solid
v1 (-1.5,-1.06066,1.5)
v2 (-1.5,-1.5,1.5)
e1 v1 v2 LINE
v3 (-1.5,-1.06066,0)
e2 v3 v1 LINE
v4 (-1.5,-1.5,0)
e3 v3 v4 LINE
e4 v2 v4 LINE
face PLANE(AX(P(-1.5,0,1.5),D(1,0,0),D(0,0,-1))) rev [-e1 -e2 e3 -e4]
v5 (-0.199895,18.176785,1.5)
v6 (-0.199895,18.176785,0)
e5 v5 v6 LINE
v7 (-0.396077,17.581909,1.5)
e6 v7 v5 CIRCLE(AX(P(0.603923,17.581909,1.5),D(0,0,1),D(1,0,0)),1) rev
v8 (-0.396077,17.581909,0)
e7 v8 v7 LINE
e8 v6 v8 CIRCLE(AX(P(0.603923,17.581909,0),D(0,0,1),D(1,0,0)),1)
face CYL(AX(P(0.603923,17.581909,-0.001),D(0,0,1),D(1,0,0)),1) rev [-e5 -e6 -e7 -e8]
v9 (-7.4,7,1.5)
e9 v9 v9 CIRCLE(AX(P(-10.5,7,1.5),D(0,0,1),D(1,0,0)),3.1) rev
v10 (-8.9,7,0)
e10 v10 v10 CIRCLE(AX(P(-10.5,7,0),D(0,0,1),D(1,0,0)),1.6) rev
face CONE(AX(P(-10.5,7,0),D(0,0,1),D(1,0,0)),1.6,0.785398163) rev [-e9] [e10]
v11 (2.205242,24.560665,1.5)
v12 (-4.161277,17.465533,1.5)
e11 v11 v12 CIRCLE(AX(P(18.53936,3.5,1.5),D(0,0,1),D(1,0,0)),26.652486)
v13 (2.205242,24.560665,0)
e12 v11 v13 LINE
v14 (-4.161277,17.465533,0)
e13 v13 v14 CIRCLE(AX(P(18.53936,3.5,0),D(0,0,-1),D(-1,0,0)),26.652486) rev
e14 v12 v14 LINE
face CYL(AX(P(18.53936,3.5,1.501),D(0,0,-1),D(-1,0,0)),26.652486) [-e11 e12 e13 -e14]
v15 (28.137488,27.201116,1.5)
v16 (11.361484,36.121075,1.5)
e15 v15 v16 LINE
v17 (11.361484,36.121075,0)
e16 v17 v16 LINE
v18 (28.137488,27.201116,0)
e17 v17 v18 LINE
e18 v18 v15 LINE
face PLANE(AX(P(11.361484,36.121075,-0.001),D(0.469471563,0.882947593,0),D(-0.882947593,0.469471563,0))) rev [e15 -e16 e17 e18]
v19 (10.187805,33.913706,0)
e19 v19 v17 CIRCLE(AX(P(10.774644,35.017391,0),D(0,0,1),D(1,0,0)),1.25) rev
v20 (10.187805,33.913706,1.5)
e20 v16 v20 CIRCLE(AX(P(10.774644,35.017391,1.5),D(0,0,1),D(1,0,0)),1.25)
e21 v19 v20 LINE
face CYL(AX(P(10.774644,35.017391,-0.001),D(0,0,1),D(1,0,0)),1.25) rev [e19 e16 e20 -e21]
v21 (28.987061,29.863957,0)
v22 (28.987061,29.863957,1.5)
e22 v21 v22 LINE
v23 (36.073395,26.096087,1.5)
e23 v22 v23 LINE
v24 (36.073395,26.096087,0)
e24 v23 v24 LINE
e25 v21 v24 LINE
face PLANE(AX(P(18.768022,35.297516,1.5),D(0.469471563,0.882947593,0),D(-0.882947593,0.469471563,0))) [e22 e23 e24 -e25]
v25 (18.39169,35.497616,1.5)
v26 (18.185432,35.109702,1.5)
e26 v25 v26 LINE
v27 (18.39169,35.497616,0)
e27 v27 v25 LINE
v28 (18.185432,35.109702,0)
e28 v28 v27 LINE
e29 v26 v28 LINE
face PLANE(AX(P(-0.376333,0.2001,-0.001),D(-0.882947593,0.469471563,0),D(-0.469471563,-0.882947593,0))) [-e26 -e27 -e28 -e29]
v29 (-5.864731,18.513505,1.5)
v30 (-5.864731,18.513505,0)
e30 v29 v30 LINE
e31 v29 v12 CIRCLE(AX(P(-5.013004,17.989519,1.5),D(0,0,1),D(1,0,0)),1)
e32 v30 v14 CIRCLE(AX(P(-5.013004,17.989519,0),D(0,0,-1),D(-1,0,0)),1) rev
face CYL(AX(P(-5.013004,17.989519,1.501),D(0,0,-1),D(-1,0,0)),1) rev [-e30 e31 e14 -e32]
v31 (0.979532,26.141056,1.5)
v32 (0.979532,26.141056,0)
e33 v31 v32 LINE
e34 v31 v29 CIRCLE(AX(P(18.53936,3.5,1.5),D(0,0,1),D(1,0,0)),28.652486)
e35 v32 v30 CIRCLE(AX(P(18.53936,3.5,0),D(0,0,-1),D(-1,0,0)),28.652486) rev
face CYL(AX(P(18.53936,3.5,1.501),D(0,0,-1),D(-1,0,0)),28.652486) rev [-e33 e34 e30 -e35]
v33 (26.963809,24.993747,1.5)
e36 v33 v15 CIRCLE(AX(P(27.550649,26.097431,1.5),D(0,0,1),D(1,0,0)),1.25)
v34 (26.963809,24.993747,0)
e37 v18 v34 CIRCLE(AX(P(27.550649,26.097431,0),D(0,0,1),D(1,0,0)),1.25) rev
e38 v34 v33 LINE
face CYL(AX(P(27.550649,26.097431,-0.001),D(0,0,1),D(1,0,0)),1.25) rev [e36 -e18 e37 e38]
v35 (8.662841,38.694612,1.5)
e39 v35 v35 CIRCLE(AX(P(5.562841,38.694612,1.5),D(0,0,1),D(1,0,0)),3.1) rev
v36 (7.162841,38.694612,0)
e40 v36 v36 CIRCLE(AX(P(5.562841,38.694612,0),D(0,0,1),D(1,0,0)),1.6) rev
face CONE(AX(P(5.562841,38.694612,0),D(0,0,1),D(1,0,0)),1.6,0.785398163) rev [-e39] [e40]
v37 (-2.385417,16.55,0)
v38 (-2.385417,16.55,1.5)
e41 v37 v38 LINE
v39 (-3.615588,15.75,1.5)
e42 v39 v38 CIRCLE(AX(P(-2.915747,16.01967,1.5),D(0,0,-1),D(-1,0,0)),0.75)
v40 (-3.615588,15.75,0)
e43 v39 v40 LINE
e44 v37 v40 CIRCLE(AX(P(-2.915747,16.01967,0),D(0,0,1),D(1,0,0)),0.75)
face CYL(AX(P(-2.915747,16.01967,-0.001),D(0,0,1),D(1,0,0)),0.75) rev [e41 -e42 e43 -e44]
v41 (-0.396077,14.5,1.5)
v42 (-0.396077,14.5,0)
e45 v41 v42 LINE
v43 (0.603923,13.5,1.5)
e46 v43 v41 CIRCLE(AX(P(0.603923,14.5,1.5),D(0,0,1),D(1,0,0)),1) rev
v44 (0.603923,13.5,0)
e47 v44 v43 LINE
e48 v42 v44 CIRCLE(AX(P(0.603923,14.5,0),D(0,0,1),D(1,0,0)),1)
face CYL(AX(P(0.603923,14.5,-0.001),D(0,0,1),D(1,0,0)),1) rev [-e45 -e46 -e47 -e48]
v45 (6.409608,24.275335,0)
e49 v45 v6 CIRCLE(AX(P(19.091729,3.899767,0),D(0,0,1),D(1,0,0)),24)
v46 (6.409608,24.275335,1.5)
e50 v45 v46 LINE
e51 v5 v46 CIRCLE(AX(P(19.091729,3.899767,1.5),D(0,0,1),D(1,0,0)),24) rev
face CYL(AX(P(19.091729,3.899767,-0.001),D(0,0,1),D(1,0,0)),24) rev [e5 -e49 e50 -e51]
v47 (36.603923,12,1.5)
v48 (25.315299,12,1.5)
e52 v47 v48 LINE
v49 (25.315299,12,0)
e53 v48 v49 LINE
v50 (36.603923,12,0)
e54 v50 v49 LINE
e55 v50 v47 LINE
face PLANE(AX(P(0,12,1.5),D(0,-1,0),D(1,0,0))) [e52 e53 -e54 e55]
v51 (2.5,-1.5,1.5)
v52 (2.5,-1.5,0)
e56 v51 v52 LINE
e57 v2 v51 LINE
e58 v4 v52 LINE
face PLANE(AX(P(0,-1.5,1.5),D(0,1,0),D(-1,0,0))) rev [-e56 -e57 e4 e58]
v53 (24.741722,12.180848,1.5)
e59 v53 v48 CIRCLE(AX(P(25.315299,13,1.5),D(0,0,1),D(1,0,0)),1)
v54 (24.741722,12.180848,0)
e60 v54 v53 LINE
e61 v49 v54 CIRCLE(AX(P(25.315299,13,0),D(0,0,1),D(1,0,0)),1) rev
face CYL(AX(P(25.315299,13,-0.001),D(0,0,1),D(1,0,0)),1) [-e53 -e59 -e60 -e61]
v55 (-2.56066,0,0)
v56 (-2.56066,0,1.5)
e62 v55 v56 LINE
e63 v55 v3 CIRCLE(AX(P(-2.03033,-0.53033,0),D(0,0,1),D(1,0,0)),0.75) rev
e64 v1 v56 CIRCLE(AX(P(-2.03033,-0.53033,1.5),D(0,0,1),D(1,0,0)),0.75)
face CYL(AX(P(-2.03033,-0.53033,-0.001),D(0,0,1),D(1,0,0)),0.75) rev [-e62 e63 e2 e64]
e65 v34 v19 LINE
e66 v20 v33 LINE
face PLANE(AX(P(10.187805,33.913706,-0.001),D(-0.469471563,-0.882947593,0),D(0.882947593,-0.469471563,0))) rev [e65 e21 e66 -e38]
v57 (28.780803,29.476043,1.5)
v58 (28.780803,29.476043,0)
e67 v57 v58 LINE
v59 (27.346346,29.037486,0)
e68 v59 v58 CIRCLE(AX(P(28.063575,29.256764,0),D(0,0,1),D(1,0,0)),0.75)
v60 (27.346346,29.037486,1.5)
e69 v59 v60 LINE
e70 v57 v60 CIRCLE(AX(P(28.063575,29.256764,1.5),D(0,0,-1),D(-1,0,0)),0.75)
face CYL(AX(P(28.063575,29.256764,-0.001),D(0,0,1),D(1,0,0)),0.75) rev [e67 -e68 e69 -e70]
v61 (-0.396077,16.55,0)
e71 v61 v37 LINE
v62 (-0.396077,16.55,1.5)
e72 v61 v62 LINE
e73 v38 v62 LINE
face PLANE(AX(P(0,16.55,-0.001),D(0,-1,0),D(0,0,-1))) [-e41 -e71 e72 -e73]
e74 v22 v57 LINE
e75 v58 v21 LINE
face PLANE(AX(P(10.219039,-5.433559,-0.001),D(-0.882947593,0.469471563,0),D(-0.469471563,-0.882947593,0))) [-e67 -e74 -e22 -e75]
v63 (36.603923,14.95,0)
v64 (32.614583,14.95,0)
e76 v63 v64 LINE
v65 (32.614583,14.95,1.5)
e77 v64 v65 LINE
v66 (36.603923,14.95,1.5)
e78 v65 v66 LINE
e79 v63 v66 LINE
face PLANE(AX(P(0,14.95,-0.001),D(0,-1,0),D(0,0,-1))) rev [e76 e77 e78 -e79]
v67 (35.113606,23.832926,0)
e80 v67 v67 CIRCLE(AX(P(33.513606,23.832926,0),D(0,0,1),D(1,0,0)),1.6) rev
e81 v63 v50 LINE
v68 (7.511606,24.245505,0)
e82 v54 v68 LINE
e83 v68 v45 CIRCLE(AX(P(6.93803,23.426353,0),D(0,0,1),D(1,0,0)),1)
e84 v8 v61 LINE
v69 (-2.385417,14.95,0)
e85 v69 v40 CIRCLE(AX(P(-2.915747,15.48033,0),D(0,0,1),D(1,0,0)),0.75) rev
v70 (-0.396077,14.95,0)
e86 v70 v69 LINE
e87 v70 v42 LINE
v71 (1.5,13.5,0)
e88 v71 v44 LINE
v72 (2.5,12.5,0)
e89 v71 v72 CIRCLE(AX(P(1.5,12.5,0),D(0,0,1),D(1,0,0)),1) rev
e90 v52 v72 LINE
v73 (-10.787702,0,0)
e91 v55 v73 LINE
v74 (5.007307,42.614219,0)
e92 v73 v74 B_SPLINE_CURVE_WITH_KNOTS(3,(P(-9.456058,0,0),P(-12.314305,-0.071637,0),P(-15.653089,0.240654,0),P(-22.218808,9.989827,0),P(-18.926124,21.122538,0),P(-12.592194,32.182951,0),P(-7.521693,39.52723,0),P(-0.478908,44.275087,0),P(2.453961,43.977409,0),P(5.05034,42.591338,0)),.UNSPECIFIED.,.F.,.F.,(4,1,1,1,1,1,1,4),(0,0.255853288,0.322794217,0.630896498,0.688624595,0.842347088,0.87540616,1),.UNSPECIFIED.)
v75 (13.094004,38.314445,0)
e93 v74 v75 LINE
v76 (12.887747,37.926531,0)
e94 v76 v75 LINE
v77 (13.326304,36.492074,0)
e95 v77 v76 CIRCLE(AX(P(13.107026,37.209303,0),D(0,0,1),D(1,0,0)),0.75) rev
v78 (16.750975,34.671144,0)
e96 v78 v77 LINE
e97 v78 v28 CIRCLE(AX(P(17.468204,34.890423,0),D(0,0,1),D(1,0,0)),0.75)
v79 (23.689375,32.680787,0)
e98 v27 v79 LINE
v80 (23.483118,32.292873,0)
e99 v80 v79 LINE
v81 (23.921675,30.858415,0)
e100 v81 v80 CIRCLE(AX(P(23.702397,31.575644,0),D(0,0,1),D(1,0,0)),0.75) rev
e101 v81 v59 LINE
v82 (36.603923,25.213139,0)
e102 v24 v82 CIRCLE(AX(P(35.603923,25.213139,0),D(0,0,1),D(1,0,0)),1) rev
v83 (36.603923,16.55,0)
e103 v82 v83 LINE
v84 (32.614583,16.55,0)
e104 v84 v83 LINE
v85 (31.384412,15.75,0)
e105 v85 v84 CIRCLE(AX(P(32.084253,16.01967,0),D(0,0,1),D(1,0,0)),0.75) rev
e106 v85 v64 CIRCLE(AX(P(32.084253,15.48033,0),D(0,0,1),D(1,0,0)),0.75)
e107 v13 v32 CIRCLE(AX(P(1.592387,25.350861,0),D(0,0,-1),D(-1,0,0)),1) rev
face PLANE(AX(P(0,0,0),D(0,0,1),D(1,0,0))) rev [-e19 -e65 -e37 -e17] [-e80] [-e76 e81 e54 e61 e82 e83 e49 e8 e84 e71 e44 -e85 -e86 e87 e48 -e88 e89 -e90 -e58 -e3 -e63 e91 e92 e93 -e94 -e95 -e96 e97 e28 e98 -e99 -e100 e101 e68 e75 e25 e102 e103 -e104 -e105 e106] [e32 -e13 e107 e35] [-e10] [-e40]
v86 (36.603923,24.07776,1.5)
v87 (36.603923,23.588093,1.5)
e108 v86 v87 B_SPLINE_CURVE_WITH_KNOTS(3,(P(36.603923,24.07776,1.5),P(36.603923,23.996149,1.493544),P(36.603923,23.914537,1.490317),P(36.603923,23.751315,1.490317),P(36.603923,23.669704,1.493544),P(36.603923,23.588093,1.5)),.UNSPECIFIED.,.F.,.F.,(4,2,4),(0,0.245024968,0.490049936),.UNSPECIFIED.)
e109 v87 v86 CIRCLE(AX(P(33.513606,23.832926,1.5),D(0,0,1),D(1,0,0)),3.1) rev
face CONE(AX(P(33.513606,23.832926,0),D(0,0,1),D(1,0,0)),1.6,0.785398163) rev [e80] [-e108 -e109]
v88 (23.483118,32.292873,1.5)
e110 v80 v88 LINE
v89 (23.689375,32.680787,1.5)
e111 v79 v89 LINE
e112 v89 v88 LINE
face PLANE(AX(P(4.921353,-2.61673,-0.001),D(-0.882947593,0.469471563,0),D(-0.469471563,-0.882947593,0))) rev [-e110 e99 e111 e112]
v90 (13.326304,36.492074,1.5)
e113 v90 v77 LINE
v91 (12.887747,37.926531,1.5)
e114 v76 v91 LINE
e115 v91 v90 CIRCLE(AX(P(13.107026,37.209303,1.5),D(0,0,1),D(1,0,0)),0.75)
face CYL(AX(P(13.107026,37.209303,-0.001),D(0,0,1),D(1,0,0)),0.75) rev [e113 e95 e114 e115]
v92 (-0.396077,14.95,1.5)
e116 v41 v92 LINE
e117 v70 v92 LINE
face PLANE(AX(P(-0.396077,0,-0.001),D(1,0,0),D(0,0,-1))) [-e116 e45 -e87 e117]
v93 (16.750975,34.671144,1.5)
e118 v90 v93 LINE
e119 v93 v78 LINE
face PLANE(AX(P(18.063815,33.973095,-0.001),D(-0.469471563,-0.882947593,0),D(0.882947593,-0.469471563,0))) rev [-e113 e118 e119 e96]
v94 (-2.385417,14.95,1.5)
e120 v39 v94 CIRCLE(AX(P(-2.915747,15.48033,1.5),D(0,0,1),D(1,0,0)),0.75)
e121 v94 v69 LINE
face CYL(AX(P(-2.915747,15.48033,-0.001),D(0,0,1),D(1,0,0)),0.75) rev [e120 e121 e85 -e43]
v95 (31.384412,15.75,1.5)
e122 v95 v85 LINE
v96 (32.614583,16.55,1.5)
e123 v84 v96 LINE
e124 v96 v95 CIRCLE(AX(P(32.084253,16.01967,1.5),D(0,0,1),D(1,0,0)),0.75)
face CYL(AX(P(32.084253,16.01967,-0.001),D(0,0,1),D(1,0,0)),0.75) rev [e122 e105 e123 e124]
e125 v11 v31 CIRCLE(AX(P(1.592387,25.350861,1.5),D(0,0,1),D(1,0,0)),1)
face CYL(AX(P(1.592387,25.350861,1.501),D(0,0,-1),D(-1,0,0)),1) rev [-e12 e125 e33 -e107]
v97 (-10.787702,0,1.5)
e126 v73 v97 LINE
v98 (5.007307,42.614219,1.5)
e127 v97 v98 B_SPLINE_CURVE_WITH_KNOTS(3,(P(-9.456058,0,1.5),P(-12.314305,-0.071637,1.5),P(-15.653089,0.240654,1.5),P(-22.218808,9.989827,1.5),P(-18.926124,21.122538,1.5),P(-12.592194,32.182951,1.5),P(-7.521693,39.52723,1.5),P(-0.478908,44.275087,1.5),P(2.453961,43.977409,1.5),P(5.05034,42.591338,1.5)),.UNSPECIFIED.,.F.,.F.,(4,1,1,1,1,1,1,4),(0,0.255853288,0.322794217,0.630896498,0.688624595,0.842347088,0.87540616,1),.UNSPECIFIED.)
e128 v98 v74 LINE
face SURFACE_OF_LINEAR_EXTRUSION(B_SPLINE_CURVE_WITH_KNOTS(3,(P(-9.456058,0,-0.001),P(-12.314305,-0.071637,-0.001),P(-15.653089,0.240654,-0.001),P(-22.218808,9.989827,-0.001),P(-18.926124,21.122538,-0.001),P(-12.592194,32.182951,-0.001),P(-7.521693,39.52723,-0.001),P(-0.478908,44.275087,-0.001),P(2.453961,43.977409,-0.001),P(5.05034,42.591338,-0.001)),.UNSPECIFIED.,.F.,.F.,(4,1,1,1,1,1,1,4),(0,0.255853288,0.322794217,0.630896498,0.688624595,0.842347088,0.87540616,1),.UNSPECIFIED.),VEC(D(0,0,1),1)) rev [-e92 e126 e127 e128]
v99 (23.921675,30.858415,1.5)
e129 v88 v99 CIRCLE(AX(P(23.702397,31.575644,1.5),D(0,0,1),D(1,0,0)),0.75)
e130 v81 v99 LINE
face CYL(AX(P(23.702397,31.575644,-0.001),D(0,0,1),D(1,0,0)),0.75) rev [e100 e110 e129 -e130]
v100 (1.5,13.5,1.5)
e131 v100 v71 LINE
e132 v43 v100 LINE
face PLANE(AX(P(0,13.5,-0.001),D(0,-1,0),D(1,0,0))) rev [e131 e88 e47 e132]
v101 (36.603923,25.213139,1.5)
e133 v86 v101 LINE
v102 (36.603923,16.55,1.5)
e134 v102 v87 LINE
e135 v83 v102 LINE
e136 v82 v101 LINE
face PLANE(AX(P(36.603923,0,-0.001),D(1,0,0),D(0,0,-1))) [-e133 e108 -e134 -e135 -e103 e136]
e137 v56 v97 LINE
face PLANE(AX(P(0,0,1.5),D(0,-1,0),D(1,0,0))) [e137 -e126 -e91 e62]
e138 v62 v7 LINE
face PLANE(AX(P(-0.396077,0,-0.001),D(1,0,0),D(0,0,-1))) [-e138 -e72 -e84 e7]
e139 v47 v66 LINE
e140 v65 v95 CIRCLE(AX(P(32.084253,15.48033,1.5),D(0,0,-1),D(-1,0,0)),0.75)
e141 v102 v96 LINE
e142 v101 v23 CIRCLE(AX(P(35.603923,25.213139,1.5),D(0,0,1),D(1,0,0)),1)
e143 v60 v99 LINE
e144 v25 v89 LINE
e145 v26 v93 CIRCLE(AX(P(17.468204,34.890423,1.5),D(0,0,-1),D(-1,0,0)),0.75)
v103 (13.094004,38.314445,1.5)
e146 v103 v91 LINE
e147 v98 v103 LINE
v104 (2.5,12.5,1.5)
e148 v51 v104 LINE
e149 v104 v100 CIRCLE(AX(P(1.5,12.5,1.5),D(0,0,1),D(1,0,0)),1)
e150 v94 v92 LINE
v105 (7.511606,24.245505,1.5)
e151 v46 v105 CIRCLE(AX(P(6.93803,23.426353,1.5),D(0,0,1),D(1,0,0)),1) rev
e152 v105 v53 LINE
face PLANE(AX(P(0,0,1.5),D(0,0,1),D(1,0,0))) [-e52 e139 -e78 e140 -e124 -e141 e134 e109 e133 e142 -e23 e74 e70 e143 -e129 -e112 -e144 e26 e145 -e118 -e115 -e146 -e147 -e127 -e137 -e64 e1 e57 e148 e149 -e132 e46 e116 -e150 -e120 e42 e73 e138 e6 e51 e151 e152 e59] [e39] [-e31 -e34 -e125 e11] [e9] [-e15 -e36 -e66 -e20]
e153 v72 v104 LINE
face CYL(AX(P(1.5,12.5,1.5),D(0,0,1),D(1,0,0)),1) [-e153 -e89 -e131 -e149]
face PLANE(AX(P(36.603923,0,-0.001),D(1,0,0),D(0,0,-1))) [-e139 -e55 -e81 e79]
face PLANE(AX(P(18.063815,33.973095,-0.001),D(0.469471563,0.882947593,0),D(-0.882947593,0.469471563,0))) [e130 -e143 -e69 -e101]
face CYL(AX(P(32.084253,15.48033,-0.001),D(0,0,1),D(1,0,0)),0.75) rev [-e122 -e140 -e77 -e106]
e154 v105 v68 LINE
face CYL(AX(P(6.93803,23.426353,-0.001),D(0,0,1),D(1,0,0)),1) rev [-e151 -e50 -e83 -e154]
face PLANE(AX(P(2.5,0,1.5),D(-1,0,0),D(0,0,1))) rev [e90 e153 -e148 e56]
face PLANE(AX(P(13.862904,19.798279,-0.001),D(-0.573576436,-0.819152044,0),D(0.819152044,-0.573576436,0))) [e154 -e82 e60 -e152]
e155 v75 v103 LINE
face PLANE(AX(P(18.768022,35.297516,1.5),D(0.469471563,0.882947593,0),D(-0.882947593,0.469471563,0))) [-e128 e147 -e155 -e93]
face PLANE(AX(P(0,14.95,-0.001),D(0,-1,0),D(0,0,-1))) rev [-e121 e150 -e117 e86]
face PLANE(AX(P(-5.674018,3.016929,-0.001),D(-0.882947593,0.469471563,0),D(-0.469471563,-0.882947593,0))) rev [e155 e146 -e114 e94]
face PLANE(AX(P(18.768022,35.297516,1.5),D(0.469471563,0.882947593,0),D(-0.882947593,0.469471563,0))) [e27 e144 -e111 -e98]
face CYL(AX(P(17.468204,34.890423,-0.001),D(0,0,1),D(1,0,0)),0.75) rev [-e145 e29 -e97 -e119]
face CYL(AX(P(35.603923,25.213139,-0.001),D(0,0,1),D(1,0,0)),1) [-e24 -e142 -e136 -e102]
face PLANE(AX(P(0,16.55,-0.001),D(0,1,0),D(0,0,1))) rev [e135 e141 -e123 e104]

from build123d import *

# Parameters (mm, degrees)
BASE_DEPTH                        = 1.5
CAMERA_CUT_REACH                  = 81.23
TOP_COVER_SOCKETS_REACH           = 81.23
SKETCH4_W                         = 5
SKETCH4_H                         = 1.5
STANDOFF_HOLE_REACH               = 62.831
SKETCH5_R                         = 1.6
GOPRO_MOUNT_HOLDERS_REACH         = 62.831
CAMERA_ANGLE_ADJUSTMENT_CUT_REACH = 62.831
FILLET6_R                         = 1
MILLING_START                     = -1.5
SKETCH10_R                        = 0.75
MILLING_HOLES_DEPTH               = 1.5
GOPRO_STRAP_REACH                 = 62.831
CHAMFER1_SIZE                     = 1.5
FRONT_CURVE_REACH                 = 62.831
FILLET7_R                         = 1


with BuildPart() as part:
    # Sketch1 → Base (new body)
    with BuildSketch(Plane.XY):
        Polygon((2.5, 0), (0, 0), (-1.5, 0), (-1.5, -1.5), (2.5, -1.5), align=None)
        Polygon((-1.5, 0), (0, 0), (2.5, 0), (2.5, 12), (62.584278166, 12), (-6.179064047, 48.562117607), (-32, 0), align=None)
    extrude(amount=BASE_DEPTH)

    # Sketch3 → Camera cut (cut, up to next)
    with BuildSketch(Plane.XY.offset(1.5), mode=Mode.PRIVATE) as camera_cut_sk1:
        with BuildLine():
            Line((2.5, 12), (25, 12))
            Line((25, 12), (6.978655026, 24.6186816))
            ThreePointArc((6.978655026, 24.6186816), (2.93893247, 21.650461355), (-0.396076952, 17.907814978))
            Line((-0.396076952, 17.907814978), (-0.396076952, 13.5))
            Line((-0.396076952, 13.5), (2.5, 13.5))
            Line((2.5, 13.5), (2.5, 12))
        make_face()
    camera_cut_tool1 = extrude(camera_cut_sk1.sketch, amount=-CAMERA_CUT_REACH, mode=Mode.PRIVATE) & part.part
    add(camera_cut_tool1.solids().sort_by_distance((9.594765, 16.626253, 1.5))[0], mode=Mode.SUBTRACT)

    # Sketch4 → Top cover sockets (cut, up to next)
    with BuildSketch(Plane.XY.offset(1.5), mode=Mode.PRIVATE) as top_cover_sockets_sk1:
        Polygon((36.603923048, 16.5), (36.603923048, 15), (36.603923048, 14.95), (36.603923048, 12), (62.584278166, 12), (36.603923048, 25.813999854), (36.603923048, 16.55), align=None)
    top_cover_sockets_tool1 = extrude(top_cover_sockets_sk1.sketch, amount=-TOP_COVER_SOCKETS_REACH, mode=Mode.PRIVATE) & part.part
    # Sketch4 → Top cover sockets (cut, up to next)
    with BuildSketch(Plane.XY.offset(1.5), mode=Mode.PRIVATE) as top_cover_sockets_sk2:
        with Locations((34.103923048, 15.75)):
            Rectangle(SKETCH4_W, SKETCH4_H)
    top_cover_sockets_tool2 = extrude(top_cover_sockets_sk2.sketch, amount=-TOP_COVER_SOCKETS_REACH, mode=Mode.PRIVATE) & part.part
    # Sketch4 → Top cover sockets (cut, up to next)
    with BuildSketch(Plane.XY.offset(1.5), mode=Mode.PRIVATE) as top_cover_sockets_sk3:
        Polygon((36.603923048, 14.95), (36.603923048, 15), (31.603923048, 15), (31.603923048, 16.5), (36.603923048, 16.5), (36.603923048, 16.55), (31.553923048, 16.55), (31.553923048, 14.95), align=None)
    top_cover_sockets_tool3 = extrude(top_cover_sockets_sk3.sketch, amount=-TOP_COVER_SOCKETS_REACH, mode=Mode.PRIVATE) & part.part
    # Sketch4 → Top cover sockets (cut, up to next)
    with BuildSketch(Plane.XY.offset(1.5), mode=Mode.PRIVATE) as top_cover_sockets_sk4:
        Polygon((-0.396076952, 16.55), (-3.446076952, 16.55), (-3.446076952, 14.95), (-0.396076952, 14.95), (-0.396076952, 15), (-3.396076952, 15), (-3.396076952, 16.5), (-0.396076952, 16.5), align=None)
    top_cover_sockets_tool4 = extrude(top_cover_sockets_sk4.sketch, amount=-TOP_COVER_SOCKETS_REACH, mode=Mode.PRIVATE) & part.part
    add(top_cover_sockets_tool1.solids().sort_by_distance((45.264041, 16.604667, 1.5))[0], mode=Mode.SUBTRACT)
    add(top_cover_sockets_tool2.solids().sort_by_distance((34.103923, 15.75, 1.5))[0], mode=Mode.SUBTRACT)
    add(top_cover_sockets_tool3.solids().sort_by_distance((36.550949, 14.975, 1.5))[0], mode=Mode.SUBTRACT)
    add(top_cover_sockets_tool4.solids().sort_by_distance((-1.921077, 16.515558, 1.5))[0], mode=Mode.SUBTRACT)


with BuildPart() as top_cover_sockets_kept_piece:
    # of the separate pieces the step leaves, the one the design keeps (top_cover_sockets_pieces_kept)
    add(part.part.solids().sort_by_distance((-6.179064047, 48.562117607, 0))[0])

    # Sketch5 → Standoff hole (cut, up to next)
    with BuildSketch(Plane.XY.offset(1.5), mode=Mode.PRIVATE) as standoff_hole_sk1:
        with Locations((5.562840845, 38.694611868)):
            Circle(SKETCH5_R)
    standoff_hole_tool1 = extrude(standoff_hole_sk1.sketch, amount=-STANDOFF_HOLE_REACH, mode=Mode.PRIVATE) & top_cover_sockets_kept_piece.part
    # Sketch5 → Standoff hole (cut, up to next)
    with BuildSketch(Plane.XY.offset(1.5), mode=Mode.PRIVATE) as standoff_hole_sk2:
        with Locations((33.513606473, 23.832926162)):
            Circle(SKETCH5_R)
    standoff_hole_tool2 = extrude(standoff_hole_sk2.sketch, amount=-STANDOFF_HOLE_REACH, mode=Mode.PRIVATE) & top_cover_sockets_kept_piece.part
    # Sketch5 → Standoff hole (cut, up to next)
    with BuildSketch(Plane.XY.offset(1.5), mode=Mode.PRIVATE) as standoff_hole_sk3:
        with Locations((-10.5, 7)):
            Circle(SKETCH5_R)
    standoff_hole_tool3 = extrude(standoff_hole_sk3.sketch, amount=-STANDOFF_HOLE_REACH, mode=Mode.PRIVATE) & top_cover_sockets_kept_piece.part
    add(standoff_hole_tool1.solids().sort_by_distance((5.562841, 38.694612, 1.5))[0], mode=Mode.SUBTRACT)
    add(standoff_hole_tool2.solids().sort_by_distance((33.513606, 23.832926, 1.5))[0], mode=Mode.SUBTRACT)
    add(standoff_hole_tool3.solids().sort_by_distance((-10.5, 7, 1.5))[0], mode=Mode.SUBTRACT)

    # Sketch6 → Gopro mount holders (cut, up to next)
    with BuildSketch(Plane.XY.offset(1.5), mode=Mode.PRIVATE) as gopro_mount_holders_sk1:
        Polygon((18.391689882, 35.497616), (13.094004325, 38.314445377), (12.38979698, 36.990023988), (17.687482537, 34.173194611), align=None)
    gopro_mount_holders_tool1 = extrude(gopro_mount_holders_sk1.sketch, amount=-GOPRO_MOUNT_HOLDERS_REACH, mode=Mode.PRIVATE) & top_cover_sockets_kept_piece.part
    # Sketch6 → Gopro mount holders (cut, up to next)
    with BuildSketch(Plane.XY.offset(1.5), mode=Mode.PRIVATE) as gopro_mount_holders_sk2:
        Polygon((28.987060996, 29.863957247), (23.689375439, 32.680786624), (22.985168095, 31.356365234), (28.282853652, 28.539535858), align=None)
    gopro_mount_holders_tool2 = extrude(gopro_mount_holders_sk2.sketch, amount=-GOPRO_MOUNT_HOLDERS_REACH, mode=Mode.PRIVATE) & top_cover_sockets_kept_piece.part
    add(gopro_mount_holders_tool1.solids().sort_by_distance((15.390743, 36.24382, 1.5))[0], mode=Mode.SUBTRACT)
    add(gopro_mount_holders_tool2.solids().sort_by_distance((25.986115, 30.610161, 1.5))[0], mode=Mode.SUBTRACT)

    # Sketch9 → Camera angle adjustment cut (cut, up to next)
    with BuildSketch(Plane.XY, mode=Mode.PRIVATE) as camera_angle_adjustment_cut_sk1:
        with BuildLine():
            ThreePointArc((-5.864731087, 18.513504832), (-5.536990387, 17.137791914), (-4.161277468, 17.465532614))
            ThreePointArc((-4.161277468, 17.465532614), (-1.297808632, 21.300050039), (2.205242111, 24.560665496))
            ThreePointArc((2.205242111, 24.560665496), (2.382581962, 25.963715951), (0.979531507, 26.141055801))
            ThreePointArc((0.979531507, 26.141055801), (-2.786387825, 22.635764075), (-5.864731087, 18.513504832))
        make_face()
    camera_angle_adjustment_cut_tool1 = extrude(camera_angle_adjustment_cut_sk1.sketch, amount=CAMERA_ANGLE_ADJUSTMENT_CUT_REACH, mode=Mode.PRIVATE) & top_cover_sockets_kept_piece.part
    add(camera_angle_adjustment_cut_tool1.solids().sort_by_distance((-1.901224, 21.8415, 0))[0], mode=Mode.SUBTRACT)

    # Fillet6
    fillet6_edges = [top_cover_sockets_kept_piece.edges().sort_by_distance(p)[0] for p in [
        (36.603923048, 25.813999854, 0.75),
    ]]
    fillet(fillet6_edges, radius=FILLET6_R)

    # Sketch10 → Milling holes (cut)
    with BuildSketch(Plane.XY.offset(1.5).offset(MILLING_START)):
        with Locations((-2.915746866, 15.480330086)):
            Circle(SKETCH10_R)
        with Locations((-2.915746866, 16.019669914)):
            Circle(SKETCH10_R)
        with Locations((13.107025547, 37.209302766)):
            Circle(SKETCH10_R)
        with Locations((23.702396662, 31.575644013)):
            Circle(SKETCH10_R)
        with Locations((17.468203759, 34.890423178)):
            Circle(SKETCH10_R)
        with Locations((28.063574873, 29.256764425)):
            Circle(SKETCH10_R)
        with Locations((32.084253134, 16.019669914)):
            Circle(SKETCH10_R)
        with Locations((32.084253134, 15.480330086)):
            Circle(SKETCH10_R)
        with Locations((-2.030330086, -0.530330086)):
            Circle(SKETCH10_R)
    extrude(amount=MILLING_HOLES_DEPTH, mode=Mode.SUBTRACT)

    # Sketch11 → Gopro strap (cut, up to next)
    with BuildSketch(Plane.XY.offset(1.5), mode=Mode.PRIVATE) as gopro_strap_sk1:
        with BuildLine():
            Line((11.36148373, 36.121075278), (28.137487995, 27.201115585))
            ThreePointArc((28.137487995, 27.201115585), (28.654333032, 25.510591641), (26.963809088, 24.993746603))
            Line((26.963809088, 24.993746603), (10.187804823, 33.913706296))
            ThreePointArc((10.187804823, 33.913706296), (9.670959786, 35.604230241), (11.36148373, 36.121075278))
        make_face()
    gopro_strap_tool1 = extrude(gopro_strap_sk1.sketch, amount=-GOPRO_STRAP_REACH, mode=Mode.PRIVATE) & top_cover_sockets_kept_piece.part
    add(gopro_strap_tool1.solids().sort_by_distance((19.162646, 30.557411, 1.5))[0], mode=Mode.SUBTRACT)

    # Chamfer1
    # the kernel refuses this chamfer: 1.5 mm, written as the material it takes off along each edge
    with BuildSketch(Plane(origin=(5.562840845, 38.694611868, 1.5), x_dir=(1, 0, 0), z_dir=(0, -1, 0))) as chamfer1_piece_1:
        Polygon((1.6, -CHAMFER1_SIZE), (1.6 + CHAMFER1_SIZE, 0), (1.6, 0), align=None)
    revolve(axis=Axis((5.562840845, 38.694611868, 1.5), (0, 0, 1)), mode=Mode.SUBTRACT)
    with BuildSketch(Plane(origin=(-10.5, 7, 1.5), x_dir=(1, 0, 0), z_dir=(0, -1, 0))) as chamfer1_piece_2:
        Polygon((1.6, -CHAMFER1_SIZE), (1.6 + CHAMFER1_SIZE, 0), (1.6, 0), align=None)
    revolve(axis=Axis((-10.5, 7, 1.5), (0, 0, 1)), mode=Mode.SUBTRACT)
    with BuildSketch(Plane(origin=(33.513606473, 23.832926162, 1.5), x_dir=(1, 0, 0), z_dir=(0, -1, 0))) as chamfer1_piece_3:
        Polygon((1.6, -CHAMFER1_SIZE), (1.6 + CHAMFER1_SIZE, 0), (1.6, 0), align=None)
    revolve(axis=Axis((33.513606473, 23.832926162, 1.5), (0, 0, 1)), mode=Mode.SUBTRACT)

    # Sketch12 → Front curve (cut, up to next)
    with BuildSketch(Plane.XY.offset(1.5), mode=Mode.PRIVATE) as front_curve_sk1:
        with BuildLine():
            add(Edge.make_bspline(
                [(-10.787702076, 0), (-13.145719201, 0.07852966), (-16.071191812, 0.861478335), (-22.218808251, 9.989827447), (-18.926124359, 21.122538368), (-12.592194116, 32.182950864), (-7.521693168, 39.527230078), (-0.478907967, 44.275086805), (2.453961219, 43.977408771), (5.050339622, 42.591337765)],
                knots=[0.040175263, 0.040175263, 0.040175263, 0.040175263, 0.255853288, 0.322794217, 0.630896498, 0.688624595, 0.842347088, 0.87540616, 1, 1, 1, 1], degree=3))
            Line((5.050339622, 42.591337765), (-6.179064047, 48.562117607))
            Line((-6.179064047, 48.562117607), (-32, 0))
            Line((-32, 0), (-10.787702076, 0))
        make_face()
    front_curve_tool1 = extrude(front_curve_sk1.sketch, amount=-FRONT_CURVE_REACH, mode=Mode.PRIVATE) & top_cover_sockets_kept_piece.part
    add(front_curve_tool1.solids().sort_by_distance((-0.851125, 45.037406, 1.5))[0], mode=Mode.SUBTRACT)

    # Fillet7
    fillet7_edges = [top_cover_sockets_kept_piece.edges().sort_by_distance(p)[0] for p in [
        (-0.396076952, 17.907814978, 0.75),
        (6.978655026, 24.6186816, 0.75),
        (25, 12, 0.75),
        (2.5, 13.5, 0.75),
        (-0.396076952, 13.5, 0.75),
    ]]
    fillet(fillet7_edges, radius=FILLET7_R)


solid = top_cover_sockets_kept_piece.part
